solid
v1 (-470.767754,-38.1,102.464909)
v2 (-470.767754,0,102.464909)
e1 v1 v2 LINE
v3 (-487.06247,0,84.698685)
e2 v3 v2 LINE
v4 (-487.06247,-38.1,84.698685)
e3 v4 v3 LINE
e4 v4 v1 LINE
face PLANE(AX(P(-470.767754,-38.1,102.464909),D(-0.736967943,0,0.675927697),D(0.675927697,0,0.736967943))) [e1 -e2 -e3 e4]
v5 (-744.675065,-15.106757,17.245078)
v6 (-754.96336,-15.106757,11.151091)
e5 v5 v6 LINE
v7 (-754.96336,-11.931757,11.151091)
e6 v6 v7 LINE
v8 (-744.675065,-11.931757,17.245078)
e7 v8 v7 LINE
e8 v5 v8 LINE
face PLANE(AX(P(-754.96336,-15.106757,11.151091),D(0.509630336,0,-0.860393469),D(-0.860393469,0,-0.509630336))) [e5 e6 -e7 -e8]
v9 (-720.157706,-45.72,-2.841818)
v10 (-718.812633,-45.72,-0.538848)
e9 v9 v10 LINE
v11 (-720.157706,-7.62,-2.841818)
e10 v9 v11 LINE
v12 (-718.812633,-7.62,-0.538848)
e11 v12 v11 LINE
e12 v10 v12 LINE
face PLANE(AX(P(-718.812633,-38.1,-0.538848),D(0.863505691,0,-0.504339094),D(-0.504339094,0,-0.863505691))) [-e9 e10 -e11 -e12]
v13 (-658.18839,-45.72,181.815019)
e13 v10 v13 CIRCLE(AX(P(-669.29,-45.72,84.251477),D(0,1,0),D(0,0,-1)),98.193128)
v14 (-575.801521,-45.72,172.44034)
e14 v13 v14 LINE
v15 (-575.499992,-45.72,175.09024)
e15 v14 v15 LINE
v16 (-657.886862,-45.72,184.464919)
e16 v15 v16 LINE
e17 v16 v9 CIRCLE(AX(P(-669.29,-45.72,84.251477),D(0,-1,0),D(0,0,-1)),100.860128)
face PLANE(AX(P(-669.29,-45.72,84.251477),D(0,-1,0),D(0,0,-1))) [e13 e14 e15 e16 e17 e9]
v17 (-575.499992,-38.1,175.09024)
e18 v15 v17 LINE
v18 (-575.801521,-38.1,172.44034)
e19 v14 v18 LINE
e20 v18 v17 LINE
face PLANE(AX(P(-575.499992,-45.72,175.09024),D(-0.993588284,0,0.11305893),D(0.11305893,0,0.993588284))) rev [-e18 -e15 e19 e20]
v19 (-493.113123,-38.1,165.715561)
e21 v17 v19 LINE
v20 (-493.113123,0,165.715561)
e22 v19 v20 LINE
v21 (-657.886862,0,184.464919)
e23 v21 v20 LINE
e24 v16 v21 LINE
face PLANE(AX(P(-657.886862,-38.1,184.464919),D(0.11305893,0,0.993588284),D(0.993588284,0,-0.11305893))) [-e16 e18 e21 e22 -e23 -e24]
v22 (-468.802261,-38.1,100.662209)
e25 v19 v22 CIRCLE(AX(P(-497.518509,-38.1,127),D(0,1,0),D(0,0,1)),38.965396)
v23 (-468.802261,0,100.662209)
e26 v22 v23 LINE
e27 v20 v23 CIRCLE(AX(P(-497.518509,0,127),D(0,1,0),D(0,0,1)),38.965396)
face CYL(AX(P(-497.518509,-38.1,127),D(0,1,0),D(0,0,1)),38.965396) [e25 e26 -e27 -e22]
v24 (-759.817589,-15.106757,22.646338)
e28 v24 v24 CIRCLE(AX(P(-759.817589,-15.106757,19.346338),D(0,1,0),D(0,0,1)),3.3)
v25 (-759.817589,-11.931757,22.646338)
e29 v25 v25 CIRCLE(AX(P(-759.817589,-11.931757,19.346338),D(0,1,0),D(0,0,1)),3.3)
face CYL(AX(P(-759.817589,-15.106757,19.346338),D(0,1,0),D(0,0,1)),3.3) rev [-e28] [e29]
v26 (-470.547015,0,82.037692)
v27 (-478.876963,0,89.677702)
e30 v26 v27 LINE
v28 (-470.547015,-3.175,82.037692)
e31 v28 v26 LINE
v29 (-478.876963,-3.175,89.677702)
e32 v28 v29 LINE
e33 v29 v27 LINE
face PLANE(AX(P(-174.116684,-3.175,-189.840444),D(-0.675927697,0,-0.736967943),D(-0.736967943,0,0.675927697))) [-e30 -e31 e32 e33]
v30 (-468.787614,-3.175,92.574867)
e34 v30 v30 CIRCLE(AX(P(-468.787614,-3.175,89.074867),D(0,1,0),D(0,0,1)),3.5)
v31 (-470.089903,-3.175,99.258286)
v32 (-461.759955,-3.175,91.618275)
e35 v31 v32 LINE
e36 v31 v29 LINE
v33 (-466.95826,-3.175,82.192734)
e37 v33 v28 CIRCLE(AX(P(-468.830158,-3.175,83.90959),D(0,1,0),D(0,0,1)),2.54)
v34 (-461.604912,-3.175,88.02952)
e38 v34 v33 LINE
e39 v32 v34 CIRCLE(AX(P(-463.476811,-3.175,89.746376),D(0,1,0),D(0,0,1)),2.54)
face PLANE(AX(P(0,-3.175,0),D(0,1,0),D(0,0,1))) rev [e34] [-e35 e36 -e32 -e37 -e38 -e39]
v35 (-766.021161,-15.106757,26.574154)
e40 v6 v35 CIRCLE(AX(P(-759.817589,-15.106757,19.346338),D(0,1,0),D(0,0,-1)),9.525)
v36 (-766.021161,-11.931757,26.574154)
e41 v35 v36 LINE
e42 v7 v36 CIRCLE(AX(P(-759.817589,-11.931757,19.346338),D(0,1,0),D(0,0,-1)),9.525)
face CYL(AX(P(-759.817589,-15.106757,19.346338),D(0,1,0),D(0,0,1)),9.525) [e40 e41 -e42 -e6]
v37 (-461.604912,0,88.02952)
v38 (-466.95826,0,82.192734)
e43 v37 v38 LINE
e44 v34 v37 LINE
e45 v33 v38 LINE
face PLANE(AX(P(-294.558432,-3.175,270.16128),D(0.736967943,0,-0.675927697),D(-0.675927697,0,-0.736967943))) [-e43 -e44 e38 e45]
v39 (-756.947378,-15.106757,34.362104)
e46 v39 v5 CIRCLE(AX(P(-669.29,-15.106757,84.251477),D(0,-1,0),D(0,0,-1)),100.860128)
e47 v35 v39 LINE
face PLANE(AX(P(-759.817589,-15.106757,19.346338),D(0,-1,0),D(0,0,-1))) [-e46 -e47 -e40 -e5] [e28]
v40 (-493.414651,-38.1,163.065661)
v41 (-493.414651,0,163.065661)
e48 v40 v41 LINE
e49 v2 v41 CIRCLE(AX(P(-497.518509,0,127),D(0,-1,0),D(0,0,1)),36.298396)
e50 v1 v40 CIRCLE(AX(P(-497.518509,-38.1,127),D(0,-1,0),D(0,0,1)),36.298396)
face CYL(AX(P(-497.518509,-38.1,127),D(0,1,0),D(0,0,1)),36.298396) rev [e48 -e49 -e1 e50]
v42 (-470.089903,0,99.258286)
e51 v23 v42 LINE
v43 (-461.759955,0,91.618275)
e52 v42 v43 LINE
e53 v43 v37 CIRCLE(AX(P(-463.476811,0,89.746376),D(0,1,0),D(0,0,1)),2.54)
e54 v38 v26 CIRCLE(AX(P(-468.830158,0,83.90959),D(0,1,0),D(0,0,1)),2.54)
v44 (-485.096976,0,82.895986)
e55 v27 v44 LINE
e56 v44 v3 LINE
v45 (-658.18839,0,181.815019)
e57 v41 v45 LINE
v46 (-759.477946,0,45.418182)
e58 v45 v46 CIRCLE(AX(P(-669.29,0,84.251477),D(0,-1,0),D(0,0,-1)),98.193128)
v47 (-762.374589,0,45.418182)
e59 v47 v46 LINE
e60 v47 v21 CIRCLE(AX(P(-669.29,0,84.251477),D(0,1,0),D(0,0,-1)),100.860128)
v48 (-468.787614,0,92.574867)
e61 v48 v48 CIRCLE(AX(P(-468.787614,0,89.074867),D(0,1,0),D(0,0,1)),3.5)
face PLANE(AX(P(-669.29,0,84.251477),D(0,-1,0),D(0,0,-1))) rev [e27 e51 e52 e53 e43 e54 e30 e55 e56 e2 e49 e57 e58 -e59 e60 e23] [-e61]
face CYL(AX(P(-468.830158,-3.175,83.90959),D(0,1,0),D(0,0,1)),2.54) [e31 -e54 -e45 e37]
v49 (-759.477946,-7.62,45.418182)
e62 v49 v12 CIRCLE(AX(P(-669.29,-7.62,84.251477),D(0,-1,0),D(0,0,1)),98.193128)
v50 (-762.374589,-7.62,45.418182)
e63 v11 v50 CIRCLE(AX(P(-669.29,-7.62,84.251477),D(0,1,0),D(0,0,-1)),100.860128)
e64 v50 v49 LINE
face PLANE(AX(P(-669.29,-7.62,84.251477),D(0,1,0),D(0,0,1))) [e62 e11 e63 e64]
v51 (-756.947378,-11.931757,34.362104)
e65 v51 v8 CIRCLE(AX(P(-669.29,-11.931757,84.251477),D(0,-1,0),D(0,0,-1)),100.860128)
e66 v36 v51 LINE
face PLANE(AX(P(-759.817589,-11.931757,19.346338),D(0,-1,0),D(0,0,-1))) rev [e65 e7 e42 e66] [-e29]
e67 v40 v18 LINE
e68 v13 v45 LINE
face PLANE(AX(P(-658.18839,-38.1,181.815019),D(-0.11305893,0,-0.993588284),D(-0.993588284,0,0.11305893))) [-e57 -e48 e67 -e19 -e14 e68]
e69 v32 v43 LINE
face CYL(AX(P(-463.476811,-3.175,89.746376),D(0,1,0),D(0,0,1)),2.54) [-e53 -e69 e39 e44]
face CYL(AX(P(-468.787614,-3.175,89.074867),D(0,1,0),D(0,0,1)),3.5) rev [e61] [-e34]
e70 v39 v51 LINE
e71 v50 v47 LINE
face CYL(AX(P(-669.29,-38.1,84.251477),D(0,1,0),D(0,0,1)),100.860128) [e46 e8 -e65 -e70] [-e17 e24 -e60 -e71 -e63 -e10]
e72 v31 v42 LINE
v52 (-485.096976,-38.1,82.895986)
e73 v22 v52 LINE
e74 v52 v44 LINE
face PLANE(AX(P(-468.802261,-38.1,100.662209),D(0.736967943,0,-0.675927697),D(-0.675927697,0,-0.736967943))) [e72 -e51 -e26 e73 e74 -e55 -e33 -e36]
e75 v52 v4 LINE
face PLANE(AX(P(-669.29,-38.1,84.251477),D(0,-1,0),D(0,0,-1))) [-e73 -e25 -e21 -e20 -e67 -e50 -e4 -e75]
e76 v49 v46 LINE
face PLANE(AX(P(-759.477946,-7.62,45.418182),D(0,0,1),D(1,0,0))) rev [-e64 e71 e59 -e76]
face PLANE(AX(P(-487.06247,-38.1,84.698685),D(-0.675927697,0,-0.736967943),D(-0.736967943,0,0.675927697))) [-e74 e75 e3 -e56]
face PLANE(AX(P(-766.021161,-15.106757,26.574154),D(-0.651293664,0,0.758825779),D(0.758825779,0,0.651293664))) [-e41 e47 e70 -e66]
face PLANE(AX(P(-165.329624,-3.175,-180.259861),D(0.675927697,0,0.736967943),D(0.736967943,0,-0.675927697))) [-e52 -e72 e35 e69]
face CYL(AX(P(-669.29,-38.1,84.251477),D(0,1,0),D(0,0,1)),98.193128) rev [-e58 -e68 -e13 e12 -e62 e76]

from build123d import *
from build123d.topology import SkipClean

# Parameters (mm, degrees)
BASE_FLANGE1_DEPTH  = 38.1
CUT_EXTRUDE1_DEPTH  = 7.62
BOSS_EXTRUDE1_DEPTH = 3.175
BOSS_EXTRUDE2_DEPTH = 7.62
SKETCH11_R          = 3.5
BOSS_EXTRUDE3_DEPTH = 3.175


# Sheet-metal steps are written as plain solids
with BuildPart() as part:
    # Sketch1 → Base-Flange1 (new body)
    with BuildSketch(Plane(origin=(0, 0, 0), x_dir=(1, 0, 0), z_dir=(0, 1, 0))):
        with BuildLine():
            Line((-658.18839, -181.815019342), (-493.414651072, -163.065661223))
            ThreePointArc((-493.414651072, -163.065661223), (-463.516823985, -139.706651468), (-470.767754496, -102.464908652))
            Line((-470.767754496, -102.464908652), (-487.062469778, -84.698684743))
            Line((-487.062469778, -84.698684743), (-485.096976273, -82.895985576))
            Line((-485.096976273, -82.895985576), (-468.802260992, -100.662209486))
            ThreePointArc((-468.802260992, -100.662209486), (-461.018573288, -140.640264051), (-493.113122906, -165.715561177))
            Line((-493.113122906, -165.715561177), (-657.886861835, -184.464919296))
            ThreePointArc((-657.886861835, -184.464919296), (-764.999542035, -116.070482162), (-720.157705771, 2.841817501))
            Line((-720.157705771, 2.841817501), (-718.812633408, 0.538847823))
            ThreePointArc((-718.812633408, 0.538847823), (-762.468736724, -115.229106217), (-658.18839, -181.815019342))
        make_face()
    extrude(amount=-BASE_FLANGE1_DEPTH)

    # Sketch7 → Cut-Extrude1 (cut)
    with BuildSketch(Plane(origin=(-720.157705771, 0, -2.841817501), x_dir=(1, 0, 0), z_dir=(0, 1, 0))):
        with BuildLine():
            Line((1.345072363, -2.302969678), (0, 0))
            ThreePointArc((0, 0), (-25.04555192, -20.685894616), (-42.216883241, -48.26))
            Line((-42.216883241, -48.26), (-39.320240627, -48.26))
            ThreePointArc((-39.320240627, -48.26), (-22.669860727, -22.023203588), (1.345072363, -2.302969678))
        make_face()
    extrude(amount=-CUT_EXTRUDE1_DEPTH, mode=Mode.SUBTRACT)

    # Sketch9 → Boss-Extrude1 (add)
    with BuildSketch(Plane(origin=(0, -11.93175668, 0), x_dir=(1, 0, 0), z_dir=(0, 1, 0))):
        with BuildLine():
            Line((-766.021160844, -26.574153948), (-756.947378036, -34.362103973))
            ThreePointArc((-756.947378036, -34.362103973), (-751.259248381, -25.482371354), (-744.675064761, -17.245078325))
            Line((-744.675064761, -17.245078325), (-754.96335975, -11.151090609))
            ThreePointArc((-754.96335975, -11.151090609), (-767.558577165, -13.796318349), (-766.021160844, -26.574153948))
        make_face()
        with BuildLine():
            ThreePointArc((-761.982172567, -21.837237166), (-757.32668993, -21.510922268), (-757.653004828, -16.85543963))
            ThreePointArc((-757.653004828, -16.85543963), (-762.308487465, -17.181754528), (-761.982172567, -21.837237166))
        make_face(mode=Mode.SUBTRACT)
    extrude(amount=-BOSS_EXTRUDE1_DEPTH)

    # Sketch10 → Boss-Extrude2 (add)
    with SkipClean():  # the faces are left unmerged after this step: merging them gives an invalid solid
        with BuildSketch(Plane.XZ.offset(38.1)):
            with BuildLine():
                Line((-718.812633408, -0.538847823), (-720.157705771, -2.841817501))
                ThreePointArc((-720.157705771, -2.841817501), (-764.999542035, 116.070482162), (-657.886861835, 184.464919296))
                Line((-657.886861835, 184.464919296), (-575.49999237, 175.090240236))
                Line((-575.49999237, 175.090240236), (-575.801520536, 172.440340282))
                Line((-575.801520536, 172.440340282), (-658.18839, 181.815019342))
                ThreePointArc((-658.18839, 181.815019342), (-762.468736724, 115.229106217), (-718.812633408, -0.538847823))
            make_face()
        extrude(amount=BOSS_EXTRUDE2_DEPTH)

    # Sketch11 → Boss-Extrude3 (add)
    with SkipClean():  # the faces are left unmerged after this step: merging them gives an invalid solid
        with BuildSketch(Plane(origin=(0, 0, 0), x_dir=(1, 0, 0), z_dir=(0, 1, 0))):
            with BuildLine():
                Line((-470.547014649, -82.037691541), (-478.876963309, -89.677702295))
                Line((-478.876963309, -89.677702295), (-470.089903254, -99.258285554))
                Line((-470.089903254, -99.258285554), (-461.759954594, -91.618274801))
                ThreePointArc((-461.759954594, -91.618274801), (-460.939178, -89.856007635), (-461.604912368, -88.029519876))
                Line((-461.604912368, -88.029519876), (-466.958259724, -82.192733767))
                ThreePointArc((-466.958259724, -82.192733767), (-468.72052689, -81.371957173), (-470.547014649, -82.037691541))
            make_face()
            with Locations(Location((-468.787614295, -89.074866795, 0), (0, 0, 270))):
                Circle(SKETCH11_R, mode=Mode.SUBTRACT)
        extrude(amount=-BOSS_EXTRUDE3_DEPTH)


solid = part.part
